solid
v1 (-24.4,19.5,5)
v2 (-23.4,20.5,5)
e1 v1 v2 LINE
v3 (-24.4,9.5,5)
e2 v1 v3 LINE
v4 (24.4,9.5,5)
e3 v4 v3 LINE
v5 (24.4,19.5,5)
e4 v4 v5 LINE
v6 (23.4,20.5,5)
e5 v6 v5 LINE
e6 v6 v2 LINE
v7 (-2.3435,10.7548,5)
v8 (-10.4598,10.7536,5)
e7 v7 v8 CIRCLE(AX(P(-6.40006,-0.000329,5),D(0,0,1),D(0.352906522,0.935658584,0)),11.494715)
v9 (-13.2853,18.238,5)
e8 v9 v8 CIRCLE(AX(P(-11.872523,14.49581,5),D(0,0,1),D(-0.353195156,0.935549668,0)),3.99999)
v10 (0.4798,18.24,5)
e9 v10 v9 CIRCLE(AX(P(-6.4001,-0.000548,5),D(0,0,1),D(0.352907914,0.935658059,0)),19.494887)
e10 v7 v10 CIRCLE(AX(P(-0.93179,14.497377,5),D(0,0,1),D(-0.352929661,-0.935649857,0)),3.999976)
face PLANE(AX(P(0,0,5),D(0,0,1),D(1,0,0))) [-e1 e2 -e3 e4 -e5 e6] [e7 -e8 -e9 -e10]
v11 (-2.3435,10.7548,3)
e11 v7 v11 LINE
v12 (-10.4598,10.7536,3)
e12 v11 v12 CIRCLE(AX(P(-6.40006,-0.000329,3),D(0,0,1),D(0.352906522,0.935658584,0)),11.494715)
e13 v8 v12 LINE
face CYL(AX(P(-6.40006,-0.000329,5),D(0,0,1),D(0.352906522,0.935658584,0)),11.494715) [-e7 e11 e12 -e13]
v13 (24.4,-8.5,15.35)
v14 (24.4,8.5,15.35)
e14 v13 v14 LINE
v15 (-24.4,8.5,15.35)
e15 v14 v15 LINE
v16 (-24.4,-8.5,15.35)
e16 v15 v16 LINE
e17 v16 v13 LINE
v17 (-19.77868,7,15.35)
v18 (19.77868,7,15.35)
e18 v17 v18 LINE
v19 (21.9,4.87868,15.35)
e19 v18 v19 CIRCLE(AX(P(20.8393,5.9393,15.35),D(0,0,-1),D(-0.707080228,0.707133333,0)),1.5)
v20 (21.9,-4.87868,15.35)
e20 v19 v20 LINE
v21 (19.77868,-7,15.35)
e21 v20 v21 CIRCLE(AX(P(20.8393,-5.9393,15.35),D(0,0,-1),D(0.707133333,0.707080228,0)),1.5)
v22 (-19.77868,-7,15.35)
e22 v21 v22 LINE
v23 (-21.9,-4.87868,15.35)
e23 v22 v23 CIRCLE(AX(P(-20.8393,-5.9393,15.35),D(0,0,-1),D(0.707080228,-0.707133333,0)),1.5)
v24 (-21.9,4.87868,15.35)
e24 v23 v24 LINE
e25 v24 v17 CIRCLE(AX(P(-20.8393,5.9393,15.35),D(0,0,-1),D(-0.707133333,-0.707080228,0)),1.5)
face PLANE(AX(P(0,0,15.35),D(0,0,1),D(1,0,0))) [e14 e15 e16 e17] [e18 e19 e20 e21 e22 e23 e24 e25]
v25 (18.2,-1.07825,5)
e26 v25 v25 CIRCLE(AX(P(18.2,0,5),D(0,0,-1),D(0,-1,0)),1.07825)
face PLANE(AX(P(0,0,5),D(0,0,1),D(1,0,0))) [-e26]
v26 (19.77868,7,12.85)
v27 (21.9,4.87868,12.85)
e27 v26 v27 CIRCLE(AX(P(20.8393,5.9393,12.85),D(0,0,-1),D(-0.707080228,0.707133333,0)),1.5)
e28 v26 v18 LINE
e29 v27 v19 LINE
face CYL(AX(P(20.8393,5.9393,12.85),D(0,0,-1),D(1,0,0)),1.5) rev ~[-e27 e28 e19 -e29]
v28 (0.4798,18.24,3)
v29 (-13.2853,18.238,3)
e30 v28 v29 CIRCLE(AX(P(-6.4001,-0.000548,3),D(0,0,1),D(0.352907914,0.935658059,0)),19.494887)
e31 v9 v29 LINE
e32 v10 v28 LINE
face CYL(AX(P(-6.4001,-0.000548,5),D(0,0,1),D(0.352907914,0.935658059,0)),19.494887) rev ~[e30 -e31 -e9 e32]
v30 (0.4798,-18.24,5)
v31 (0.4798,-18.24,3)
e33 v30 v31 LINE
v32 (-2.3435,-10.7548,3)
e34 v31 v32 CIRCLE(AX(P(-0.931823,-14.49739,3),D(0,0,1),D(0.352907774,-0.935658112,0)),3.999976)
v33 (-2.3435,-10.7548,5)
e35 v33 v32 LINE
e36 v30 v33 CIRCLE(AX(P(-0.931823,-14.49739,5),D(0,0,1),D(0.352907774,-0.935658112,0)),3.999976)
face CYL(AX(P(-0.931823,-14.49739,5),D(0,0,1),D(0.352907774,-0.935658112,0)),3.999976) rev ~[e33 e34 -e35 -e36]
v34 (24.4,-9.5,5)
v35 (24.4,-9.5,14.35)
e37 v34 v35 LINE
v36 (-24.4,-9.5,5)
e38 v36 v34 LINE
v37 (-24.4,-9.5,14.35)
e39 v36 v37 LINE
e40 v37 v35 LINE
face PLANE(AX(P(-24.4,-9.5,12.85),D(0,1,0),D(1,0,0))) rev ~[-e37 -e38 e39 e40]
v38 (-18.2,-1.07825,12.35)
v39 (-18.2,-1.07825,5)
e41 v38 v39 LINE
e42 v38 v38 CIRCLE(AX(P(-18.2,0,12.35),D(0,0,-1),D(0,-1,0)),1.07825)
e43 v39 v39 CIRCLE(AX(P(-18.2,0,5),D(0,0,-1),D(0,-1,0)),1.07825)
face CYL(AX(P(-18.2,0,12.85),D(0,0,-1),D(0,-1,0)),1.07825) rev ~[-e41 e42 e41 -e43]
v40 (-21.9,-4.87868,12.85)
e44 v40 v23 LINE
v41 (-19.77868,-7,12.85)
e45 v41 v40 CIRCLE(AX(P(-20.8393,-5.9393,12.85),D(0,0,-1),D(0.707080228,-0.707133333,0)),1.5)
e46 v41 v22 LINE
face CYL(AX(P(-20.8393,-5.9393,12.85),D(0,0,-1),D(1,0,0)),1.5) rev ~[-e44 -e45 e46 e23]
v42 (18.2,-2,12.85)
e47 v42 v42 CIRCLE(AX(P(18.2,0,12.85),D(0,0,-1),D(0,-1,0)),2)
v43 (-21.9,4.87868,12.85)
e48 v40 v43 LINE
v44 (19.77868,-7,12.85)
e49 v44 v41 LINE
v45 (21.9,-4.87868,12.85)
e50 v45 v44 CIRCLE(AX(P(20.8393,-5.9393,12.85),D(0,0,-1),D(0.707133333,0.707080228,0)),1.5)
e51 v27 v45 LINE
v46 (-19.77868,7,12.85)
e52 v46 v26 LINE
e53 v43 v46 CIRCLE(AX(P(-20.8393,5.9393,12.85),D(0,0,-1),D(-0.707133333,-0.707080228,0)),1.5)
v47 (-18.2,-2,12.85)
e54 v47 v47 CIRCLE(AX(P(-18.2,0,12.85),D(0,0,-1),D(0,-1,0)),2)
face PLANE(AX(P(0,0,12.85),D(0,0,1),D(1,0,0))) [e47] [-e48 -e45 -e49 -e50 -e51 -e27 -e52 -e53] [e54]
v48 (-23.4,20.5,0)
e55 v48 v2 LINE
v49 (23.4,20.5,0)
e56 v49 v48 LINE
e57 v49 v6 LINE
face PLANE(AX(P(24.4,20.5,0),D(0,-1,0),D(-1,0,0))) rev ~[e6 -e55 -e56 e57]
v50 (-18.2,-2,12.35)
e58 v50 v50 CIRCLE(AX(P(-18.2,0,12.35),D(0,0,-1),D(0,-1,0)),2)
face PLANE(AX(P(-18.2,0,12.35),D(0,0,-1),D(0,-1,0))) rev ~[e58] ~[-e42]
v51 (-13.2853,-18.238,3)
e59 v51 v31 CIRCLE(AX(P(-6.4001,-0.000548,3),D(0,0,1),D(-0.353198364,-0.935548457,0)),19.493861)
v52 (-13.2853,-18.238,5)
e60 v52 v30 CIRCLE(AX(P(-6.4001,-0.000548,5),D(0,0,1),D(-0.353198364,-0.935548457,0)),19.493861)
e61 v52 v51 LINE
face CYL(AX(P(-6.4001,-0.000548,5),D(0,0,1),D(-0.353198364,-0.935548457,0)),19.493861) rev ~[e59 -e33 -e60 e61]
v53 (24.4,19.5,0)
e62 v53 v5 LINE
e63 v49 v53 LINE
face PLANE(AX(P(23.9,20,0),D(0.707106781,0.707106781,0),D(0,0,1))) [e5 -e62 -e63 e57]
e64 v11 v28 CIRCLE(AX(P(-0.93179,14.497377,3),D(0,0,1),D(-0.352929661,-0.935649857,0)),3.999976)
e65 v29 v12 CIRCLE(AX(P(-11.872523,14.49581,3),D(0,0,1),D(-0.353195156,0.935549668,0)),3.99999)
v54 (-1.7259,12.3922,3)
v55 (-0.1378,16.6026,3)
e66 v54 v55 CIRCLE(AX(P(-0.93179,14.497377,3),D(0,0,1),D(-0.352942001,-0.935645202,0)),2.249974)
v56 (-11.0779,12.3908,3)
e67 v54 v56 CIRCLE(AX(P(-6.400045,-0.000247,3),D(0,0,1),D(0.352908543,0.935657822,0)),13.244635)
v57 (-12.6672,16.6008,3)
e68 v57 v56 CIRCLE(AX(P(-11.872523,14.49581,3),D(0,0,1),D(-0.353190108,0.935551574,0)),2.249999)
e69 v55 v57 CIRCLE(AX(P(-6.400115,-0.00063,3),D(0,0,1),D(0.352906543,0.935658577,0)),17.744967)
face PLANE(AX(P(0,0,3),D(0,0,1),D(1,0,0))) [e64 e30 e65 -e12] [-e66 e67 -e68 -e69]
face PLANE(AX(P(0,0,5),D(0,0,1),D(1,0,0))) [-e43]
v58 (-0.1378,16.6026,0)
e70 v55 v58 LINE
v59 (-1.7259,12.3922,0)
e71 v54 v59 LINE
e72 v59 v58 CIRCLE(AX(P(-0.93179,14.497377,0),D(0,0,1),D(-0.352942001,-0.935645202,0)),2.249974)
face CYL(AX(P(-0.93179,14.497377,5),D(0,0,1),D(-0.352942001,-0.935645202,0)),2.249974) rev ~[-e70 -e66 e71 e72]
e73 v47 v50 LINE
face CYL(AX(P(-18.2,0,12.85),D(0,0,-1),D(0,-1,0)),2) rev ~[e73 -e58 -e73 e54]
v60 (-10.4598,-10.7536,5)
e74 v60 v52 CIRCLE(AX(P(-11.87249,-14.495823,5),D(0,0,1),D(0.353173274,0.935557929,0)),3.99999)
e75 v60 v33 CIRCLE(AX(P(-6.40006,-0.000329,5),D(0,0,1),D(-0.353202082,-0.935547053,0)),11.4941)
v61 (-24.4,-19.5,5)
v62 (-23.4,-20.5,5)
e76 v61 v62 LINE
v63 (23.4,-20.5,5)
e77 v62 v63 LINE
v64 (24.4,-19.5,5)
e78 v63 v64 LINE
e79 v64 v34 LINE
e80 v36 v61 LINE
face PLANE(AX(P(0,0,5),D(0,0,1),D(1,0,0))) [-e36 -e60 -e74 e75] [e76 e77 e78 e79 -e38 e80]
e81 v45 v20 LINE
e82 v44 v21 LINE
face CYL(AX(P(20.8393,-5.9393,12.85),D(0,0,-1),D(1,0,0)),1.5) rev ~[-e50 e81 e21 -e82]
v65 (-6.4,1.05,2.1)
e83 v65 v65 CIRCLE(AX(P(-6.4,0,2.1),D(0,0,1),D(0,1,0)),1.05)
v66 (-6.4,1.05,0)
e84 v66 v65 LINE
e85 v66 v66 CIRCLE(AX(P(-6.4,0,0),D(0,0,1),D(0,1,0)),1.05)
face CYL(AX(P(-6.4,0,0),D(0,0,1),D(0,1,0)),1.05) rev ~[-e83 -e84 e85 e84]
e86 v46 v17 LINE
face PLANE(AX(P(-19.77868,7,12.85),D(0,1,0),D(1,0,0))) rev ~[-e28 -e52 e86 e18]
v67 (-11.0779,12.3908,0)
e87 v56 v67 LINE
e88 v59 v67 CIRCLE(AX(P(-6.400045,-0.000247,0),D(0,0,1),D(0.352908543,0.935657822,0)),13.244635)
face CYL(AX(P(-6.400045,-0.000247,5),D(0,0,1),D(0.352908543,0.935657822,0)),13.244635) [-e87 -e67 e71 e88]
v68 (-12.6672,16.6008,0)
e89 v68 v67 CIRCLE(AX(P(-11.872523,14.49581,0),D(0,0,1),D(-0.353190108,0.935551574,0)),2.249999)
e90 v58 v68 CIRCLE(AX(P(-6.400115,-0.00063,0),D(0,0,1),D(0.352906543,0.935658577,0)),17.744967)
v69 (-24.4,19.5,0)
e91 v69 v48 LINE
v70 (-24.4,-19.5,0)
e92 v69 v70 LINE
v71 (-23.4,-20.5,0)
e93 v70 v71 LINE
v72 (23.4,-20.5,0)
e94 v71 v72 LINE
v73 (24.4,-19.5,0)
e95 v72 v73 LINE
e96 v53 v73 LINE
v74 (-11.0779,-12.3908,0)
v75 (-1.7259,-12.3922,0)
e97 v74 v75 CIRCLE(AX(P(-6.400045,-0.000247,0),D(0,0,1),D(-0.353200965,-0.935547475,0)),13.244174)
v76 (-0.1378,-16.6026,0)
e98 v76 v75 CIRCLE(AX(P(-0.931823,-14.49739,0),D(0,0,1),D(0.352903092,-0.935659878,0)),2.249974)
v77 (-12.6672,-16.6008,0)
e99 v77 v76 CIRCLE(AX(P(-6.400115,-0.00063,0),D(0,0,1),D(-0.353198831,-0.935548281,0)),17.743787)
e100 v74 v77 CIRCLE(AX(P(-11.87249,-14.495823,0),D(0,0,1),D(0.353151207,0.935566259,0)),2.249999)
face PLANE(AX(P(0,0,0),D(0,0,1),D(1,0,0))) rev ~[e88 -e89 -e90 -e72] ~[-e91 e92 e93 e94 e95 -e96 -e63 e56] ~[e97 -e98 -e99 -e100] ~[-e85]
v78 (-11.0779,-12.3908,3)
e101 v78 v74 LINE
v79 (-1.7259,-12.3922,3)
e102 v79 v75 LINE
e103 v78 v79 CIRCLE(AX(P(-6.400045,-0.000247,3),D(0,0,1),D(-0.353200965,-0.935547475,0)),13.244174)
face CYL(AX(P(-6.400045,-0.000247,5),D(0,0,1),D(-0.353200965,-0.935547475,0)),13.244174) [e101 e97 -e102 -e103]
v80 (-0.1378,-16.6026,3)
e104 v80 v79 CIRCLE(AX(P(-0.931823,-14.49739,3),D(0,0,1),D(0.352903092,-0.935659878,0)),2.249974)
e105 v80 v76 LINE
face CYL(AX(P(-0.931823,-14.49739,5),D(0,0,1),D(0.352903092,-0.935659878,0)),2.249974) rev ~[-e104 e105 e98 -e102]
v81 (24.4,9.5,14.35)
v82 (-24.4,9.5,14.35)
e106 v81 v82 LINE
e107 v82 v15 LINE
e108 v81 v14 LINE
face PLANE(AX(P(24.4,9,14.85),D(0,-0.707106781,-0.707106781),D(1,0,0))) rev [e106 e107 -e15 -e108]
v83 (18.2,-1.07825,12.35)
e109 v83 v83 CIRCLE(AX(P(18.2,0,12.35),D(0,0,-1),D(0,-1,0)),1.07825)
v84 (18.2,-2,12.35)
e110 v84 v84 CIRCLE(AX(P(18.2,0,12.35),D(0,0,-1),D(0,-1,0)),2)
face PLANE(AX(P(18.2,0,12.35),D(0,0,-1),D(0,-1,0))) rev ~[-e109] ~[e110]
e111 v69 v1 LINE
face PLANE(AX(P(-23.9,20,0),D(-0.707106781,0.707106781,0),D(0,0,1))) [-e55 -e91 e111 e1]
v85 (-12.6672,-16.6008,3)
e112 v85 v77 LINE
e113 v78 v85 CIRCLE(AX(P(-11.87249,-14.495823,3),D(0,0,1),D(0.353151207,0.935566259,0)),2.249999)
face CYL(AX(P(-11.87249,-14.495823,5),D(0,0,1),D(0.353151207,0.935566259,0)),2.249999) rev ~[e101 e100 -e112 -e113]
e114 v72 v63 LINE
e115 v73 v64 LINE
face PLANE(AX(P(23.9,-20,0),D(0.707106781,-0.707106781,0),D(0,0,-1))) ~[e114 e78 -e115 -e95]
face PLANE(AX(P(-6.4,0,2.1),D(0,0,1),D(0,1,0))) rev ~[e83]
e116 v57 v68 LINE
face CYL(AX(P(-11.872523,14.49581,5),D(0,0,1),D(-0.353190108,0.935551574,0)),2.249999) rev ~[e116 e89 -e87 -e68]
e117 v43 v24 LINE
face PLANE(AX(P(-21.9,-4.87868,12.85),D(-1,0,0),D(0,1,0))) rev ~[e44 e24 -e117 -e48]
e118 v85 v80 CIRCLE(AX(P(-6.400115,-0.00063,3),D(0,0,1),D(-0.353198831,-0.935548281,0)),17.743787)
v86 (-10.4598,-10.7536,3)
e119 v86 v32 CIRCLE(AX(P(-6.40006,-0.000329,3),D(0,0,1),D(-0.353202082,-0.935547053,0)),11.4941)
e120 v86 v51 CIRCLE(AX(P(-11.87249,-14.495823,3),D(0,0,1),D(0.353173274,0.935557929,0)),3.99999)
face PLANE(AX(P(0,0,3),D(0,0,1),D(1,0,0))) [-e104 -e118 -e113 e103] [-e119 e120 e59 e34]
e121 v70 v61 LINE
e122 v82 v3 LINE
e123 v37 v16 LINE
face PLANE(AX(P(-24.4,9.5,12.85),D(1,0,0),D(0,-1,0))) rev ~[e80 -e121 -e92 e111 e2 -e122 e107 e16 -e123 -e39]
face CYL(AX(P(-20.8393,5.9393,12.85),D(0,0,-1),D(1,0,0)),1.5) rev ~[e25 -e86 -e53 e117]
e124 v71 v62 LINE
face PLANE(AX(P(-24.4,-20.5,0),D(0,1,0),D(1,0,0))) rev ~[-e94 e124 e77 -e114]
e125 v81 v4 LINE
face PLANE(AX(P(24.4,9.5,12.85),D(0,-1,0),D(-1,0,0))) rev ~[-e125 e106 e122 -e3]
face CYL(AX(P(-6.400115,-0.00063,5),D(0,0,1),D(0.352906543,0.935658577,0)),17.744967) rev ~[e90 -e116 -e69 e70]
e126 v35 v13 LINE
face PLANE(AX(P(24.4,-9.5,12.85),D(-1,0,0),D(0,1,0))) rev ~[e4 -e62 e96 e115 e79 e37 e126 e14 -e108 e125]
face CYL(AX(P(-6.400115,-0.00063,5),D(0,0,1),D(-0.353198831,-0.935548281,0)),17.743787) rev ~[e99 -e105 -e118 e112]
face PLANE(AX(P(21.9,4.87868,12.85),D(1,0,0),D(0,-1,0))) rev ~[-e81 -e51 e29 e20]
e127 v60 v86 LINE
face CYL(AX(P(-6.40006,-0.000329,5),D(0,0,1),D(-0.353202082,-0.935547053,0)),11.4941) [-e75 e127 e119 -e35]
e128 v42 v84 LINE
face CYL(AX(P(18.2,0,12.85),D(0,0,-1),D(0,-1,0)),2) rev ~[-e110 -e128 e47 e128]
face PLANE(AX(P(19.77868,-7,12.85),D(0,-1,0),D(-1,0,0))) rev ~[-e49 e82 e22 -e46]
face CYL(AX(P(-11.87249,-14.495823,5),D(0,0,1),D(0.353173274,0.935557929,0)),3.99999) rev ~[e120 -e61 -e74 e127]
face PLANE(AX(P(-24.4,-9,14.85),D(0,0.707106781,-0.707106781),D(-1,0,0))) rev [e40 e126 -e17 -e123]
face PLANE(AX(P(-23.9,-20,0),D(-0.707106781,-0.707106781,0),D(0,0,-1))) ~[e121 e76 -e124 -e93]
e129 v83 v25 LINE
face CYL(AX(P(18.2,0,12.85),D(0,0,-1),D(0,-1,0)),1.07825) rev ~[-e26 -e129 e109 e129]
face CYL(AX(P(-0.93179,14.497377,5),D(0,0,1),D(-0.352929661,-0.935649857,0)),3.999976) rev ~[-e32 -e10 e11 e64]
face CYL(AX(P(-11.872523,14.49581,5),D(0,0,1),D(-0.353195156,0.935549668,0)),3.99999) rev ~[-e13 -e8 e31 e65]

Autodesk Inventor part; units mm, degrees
ref_plane "YZ Plane" through (0, 0, 0) normal (1, 0, 0) x (0, 1, 0)
ref_plane "XZ Plane" through (0, 0, 0) normal (0, 1, 0) x (-1, 0, 0)
ref_plane "XY Plane" through (0, 0, 0) normal (0, 0, 1) x (1, 0, 0)
sketch "Sketch1" plane through (0, 0, 0) normal (0, 0, 1) x (1, 0, 0)
  line L0 (-24.4, -9.5) -> (24.4, -9.5)
  line L1 (24.4, -9.5) -> (24.4, 9.5)
  line L2 (24.4, 9.5) -> (-24.4, 9.5)
  line L3 (-24.4, 9.5) -> (-24.4, -9.5)
  line L4 (-24.4, -9.5) -> (24.4, 9.5) construction
  line L5 (24.4, -9.5) -> (-24.4, 9.5) construction
  point P0 (0, 0)
  dimension "LENGTH" = 48.8
  dimension "WIDTH" = 19
extrude "Extrusion1" add sketch "Sketch1" along normal blind 12.85
sketch "Sketch2" plane through (0, 0, 12.85) normal (0, 0, 1) x (1, 0, 0)
  point P0 (0, 0)
  point P1 (-18.2, 0)
  point P2 (18.2, 0)
  dimension "d11" = 0
  dimension "d12" = 0
  dimension "d13" = 36.4
  dimension "d14" = 18.2
hole "Hole1" at (-18.2, 0, 12.85) at (18.2, 0, 12.85) direction (0, 0, -1) diameter 2.1565 depth 8.87 thread size "4-40 UNC" class "2B" standard "ANSI Unified Screw Threads"
sketch "Sketch3" plane through (0, 0, 12.85) normal (0, 0, 1) x (1, 0, 0)
  point P0 (0, 0)
  point P1 (0, 0)
  dimension "d22" = 0
  dimension "d23" = 0
hole "Hole2" [suppressed]
sketch "Sketch4" plane through (0, 0, 0) normal (0, 0, -1) x (-1, 0, 0)
  line L0 (5.5, 0) -> (4.5, 0) construction
  line L1 (5.5, 1.05) -> (4.5, 1.05)
  line L2 (4.5, -1.05) -> (5.5, -1.05)
  arc A0 (5.5, -1.05) -> (5.5, 1.05) centre (5.5, 0) ccw
  arc A1 (4.5, 1.05) -> (4.5, -1.05) centre (4.5, 0) ccw
  point P0 (0, 0)
  point P1 (-5, 0)
  point P2 (5, 0)
  dimension "d24" = 1
  dimension "d25" = 0
  dimension "d26" = 0
  dimension "d27" = 10
  dimension "d28" = 5
  dimension "d29" = 1.05
hole "Hole3" [suppressed]
extrude "Extrusion2" [suppressed]
sketch "Sketch5" plane through (0, 0, 0) normal (0, 0, 1) x (1, 0, 0)
  line L0 (-24.4, -20.5) -> (24.4, -20.5)
  line L1 (24.4, -20.5) -> (24.4, 20.5)
  line L2 (24.4, 20.5) -> (-24.4, 20.5)
  line L3 (-24.4, 20.5) -> (-24.4, -20.5)
  line L4 (-24.4, -20.5) -> (24.4, 20.5) construction
  line L5 (24.4, -20.5) -> (-24.4, 20.5) construction
  point P0 (0, 0)
  dimension "d39" = 48.8
  dimension "d40" = 41
extrude "Extrusion3" add sketch "Sketch5" along normal blind 5
sketch "Sketch7" plane through (0, 0, 12.85) normal (0, 0, 1) x (1, 0, 0)
  circle A0 centre (18.2, 0) radius 1.0782 projected
  circle A1 centre (-18.2, 0) radius 1.0782 projected
  point P0 (0, 0)
  dimension "d54" = 0
  dimension "d55" = 0
  dimension "d56" = 0
  dimension "d57" = 0
hole "Hole5" at (18.2, 0, 12.85) at (-18.2, 0, 12.85) direction (0, 0, -1) diameter 4 depth 0.5
chamfer "Chamfer2" distance 1 angle 45 4 edges at (24.4, -20.5, 2.5) (24.4, 20.5, 2.5) (-24.4, 20.5, 2.5) (-24.4, -20.5, 2.5)
sketch "Sketch8" plane through (0, 0, 0) normal (0, 0, -1) x (-1, 0, 0)
  line L0 (0, 5.5) -> (0, 4.5) construction
  line L1 (-1.05, 5.5) -> (-1.05, 4.5)
  line L2 (1.05, 4.5) -> (1.05, 5.5)
  arc A0 (1.05, 5.5) -> (-1.05, 5.5) centre (0, 5.5) ccw
  arc A1 (-1.05, 4.5) -> (1.05, 4.5) centre (0, 4.5) ccw
  point P0 (0, 0)
  point P1 (0, -5)
  point P2 (0, 5)
  dimension "d77" = 1
  dimension "d78" = 1.05
  dimension "d79" = 10
  dimension "d80" = 0
  dimension "d81" = 0
  dimension "d82" = 5
hole "Hole6" [suppressed]
extrude "Extrusion4" [suppressed]
sketch "Sketch9" plane through (-24.4, -19.5, 0) normal (-1, 0, 0) x (0, 0, 1)
  circle A0 centre (-12.35, 19.5) radius 12.7
  line L0 (0, 39) -> (0, 0) projected
  point P0 (0, 19.5)
  point P1 (0, 16.539)
  point P2 (0, 22.461)
  dimension "d92" = 25.4
  dimension "d93" = 0
  dimension "d94" = 12.35
extrude "Extrusion5" [suppressed]
sketch "Sketch10" plane through (0, 0, 12.85) normal (0, 0, 1) x (1, 0, 0)
  line L0 (-24.4, -9.5) -> (24.4, -9.5)
  line L1 (24.4, -9.5) -> (24.4, 9.5)
  line L2 (24.4, 9.5) -> (-24.4, 9.5)
  line L3 (-24.4, 9.5) -> (-24.4, -9.5)
  line L4 (-24.4, -9.5) -> (24.4, 9.5) construction
  line L5 (24.4, -9.5) -> (-24.4, 9.5) construction
  line L6 (21.9, -7) -> (-21.9, -7)
  line L7 (-21.9, -7) -> (-21.9, 7)
  line L8 (-21.9, 7) -> (21.9, 7)
  line L9 (21.9, 7) -> (21.9, -7)
  line L10 (21.9, -7) -> (-21.9, 7) construction
  line L11 (-21.9, -7) -> (21.9, 7) construction
  circle A0 centre (-20.8393, 5.9393) radius 1.5
  circle A1 centre (-20.8393, -5.9393) radius 1.5
  circle A2 centre (20.8393, 5.9393) radius 1.5
  circle A3 centre (20.8393, -5.9393) radius 1.5
  line L12 (20.8393, 5.9393) -> (21.9, 7)
  line L13 (21.9, -7) -> (20.8393, -5.9393)
  line L14 (-20.8393, 5.9393) -> (-21.9, 7)
  line L15 (-20.8393, -5.9393) -> (-21.9, -7)
  point P0 (0, 0)
  point P1 (21.9, -4.8787)
  point P2 (19.7787, -7)
  point P3 (-19.7787, -7)
  point P4 (-21.9, -4.8787)
  point P5 (-21.9, 4.8787)
  point P6 (-19.7787, 7)
  point P7 (19.7787, 7)
  point P8 (21.9, 4.8787)
  dimension "d106" = 3
  dimension "d110" = 3
  dimension "d111" = 3
  dimension "d112" = 3
  dimension "d97" = 48.8
  dimension "d98" = 19
  dimension "d99" = 43.8
  dimension "d100" = 14
  dimension "d107" = 45
  dimension "d108" = 45
  dimension "d109" = 45
extrude "Extrusion6" add sketch "Sketch10" along normal blind 2.5
chamfer "Chamfer5" [suppressed]
chamfer "Chamfer6" distance 1 angle 45 2 edges at (0, -9.5, 15.35) (0, 9.5, 15.35)
sketch "Sketch12" plane through (0, 0, 5) normal (0, 0, 1) x (1, 0, 0)
  arc A0 (7.9961, 15.4962) -> (-8.004, 14.5013) centre (9.4196, -136.543) ccw construction
  arc A1 (7.9587, 19.496) -> (-8.4624, 18.4749) centre (9.4196, -136.543) ccw
  arc A2 (8.0336, 11.4964) -> (-7.5457, 10.5276) centre (9.4196, -136.543) ccw
  arc A3 (8.0336, 11.4964) -> (7.9587, 19.496) centre (7.9961, 15.4962) ccw
  arc A4 (-8.4624, 18.4749) -> (-7.5457, 10.5276) centre (-8.004, 14.5013) ccw
  line L0 (24.4, 2.961) -> (24.4, -2.961)
  line L1 (24.4, 0) -> (-24.4, 0)
  line L2 (-24.4, 8.5) -> (-24.4, -8.5)
  arc A5 (7.9961, 15.4962) -> (-8.004, 14.5013) centre (9.4196, -136.543) ccw construction
  arc A6 (7.9751, 17.7461) -> (-8.2619, 16.7364) centre (9.4196, -136.543) ccw
  arc A7 (8.0172, 13.2463) -> (-7.7462, 12.2661) centre (9.4196, -136.543) ccw
  arc A8 (8.0172, 13.2463) -> (7.9751, 17.7461) centre (7.9961, 15.4962) ccw
  arc A9 (-8.2619, 16.7364) -> (-7.7462, 12.2661) centre (-8.004, 14.5013) ccw
  arc A10 (-8.004, -14.5013) -> (7.9961, -15.4962) centre (9.4196, 136.543) ccw construction
  arc A11 (-8.4624, -18.4749) -> (7.9587, -19.496) centre (9.4196, 136.543) ccw
  arc A12 (-7.5457, -10.5276) -> (8.0336, -11.4964) centre (9.4196, 136.543) ccw
  arc A13 (7.9587, -19.496) -> (8.0336, -11.4964) centre (7.9961, -15.4962) ccw
  arc A14 (-7.5457, -10.5276) -> (-8.4624, -18.4749) centre (-8.004, -14.5013) ccw
  arc A15 (-8.004, -14.5013) -> (7.9961, -15.4962) centre (9.4196, 136.543) ccw construction
  arc A16 (-8.2619, -16.7364) -> (7.9751, -17.7461) centre (9.4196, 136.543) ccw
  arc A17 (-7.7462, -12.2661) -> (8.0172, -13.2463) centre (9.4196, 136.543) ccw
  arc A18 (7.9751, -17.7461) -> (8.0172, -13.2463) centre (7.9961, -15.4962) ccw
  arc A19 (-7.7462, -12.2661) -> (-8.2619, -16.7364) centre (-8.004, -14.5013) ccw
  point P0 (0, 0)
  point P1 (-8.004, 12.753)
  point P2 (7.9961, 17.2527)
  point P3 (-6.4165, 14.3405)
  point P4 (9.5836, 18.8402)
  point P5 (-8.004, -12.753)
  point P6 (7.9961, -17.2527)
  point P7 (9.5836, -18.8402)
  point P8 (-6.4165, -14.3405)
  dimension "d118" = 8
  dimension "d122" = 4.5
extrude "Extrusion12" [suppressed]
extrude "Extrusion13" [suppressed]
sketch "Sketch14" plane through (0, 0, 0) normal (0, 0, -1) x (-1, 0, 0)
  point P0 (0, 0)
  point P1 (6.4, 0)
hole "Hole7" at (-6.4, 0, 0) direction (0, 0, 1) diameter 2.1 depth 2.1
sketch "Sketch15" plane through (0, 0, 0) normal (0, 0, -1) x (-1, 0, 0)
  circle A0 centre (6.4, 0) radius 1.05 projected
  circle A1 centre (6.4, 0) radius 19.5
  circle A2 centre (6.4, 0) radius 11.5
  circle A3 centre (6.4, 0) radius 17.75
  circle A4 centre (6.4, 0) radius 13.25
  line L0 (-24.4, 9.5) -> (24.4, 9.5) projected
  line L1 (24.4, 9.5) -> (-24.4, 9.5)
  line L2 (-24.4, -19.5) -> (-24.4, 19.5) projected
  line L3 (24.4, -9.5) -> (-24.4, -9.5) projected
  line L4 (24.4, -9.5) -> (-24.4, -9.5)
  arc A5 (9.3371, 17.5053) -> (5.1369, 17.705) centre (6.4, 0) ccw
  arc A6 (8.5925, 13.0673) -> (5.4572, 13.2164) centre (6.4, 0) ccw
  arc A7 (13.9857, 17.9641) -> (-1.4292, 17.8592) centre (6.4, 0) ccw
  arc A8 (10.8736, 10.5942) -> (1.7828, 10.5324) centre (6.4, 0) ccw
  arc A9 (11.8707, 14.5025) -> (0.9294, 14.5025) centre (6.4, 0) ccw construction
  arc A10 (13.2825, 18.2451) -> (-0.4824, 18.2451) centre (6.4, 0) ccw
  arc A11 (10.4589, 10.7599) -> (2.3412, 10.7599) centre (6.4, 0) ccw
  arc A12 (10.4589, 10.7599) -> (13.2825, 18.2451) centre (11.8707, 14.5025) ccw
  arc A13 (-0.4824, 18.2451) -> (2.3412, 10.7599) centre (0.9294, 14.5025) ccw
  arc A14 (11.8707, 14.5025) -> (0.9294, 14.5025) centre (6.4, 0) ccw construction
  arc A15 (12.6648, 16.6077) -> (0.1352, 16.6077) centre (6.4, 0) ccw
  arc A16 (11.0766, 12.3973) -> (1.7235, 12.3973) centre (6.4, 0) ccw
  arc A17 (11.0766, 12.3973) -> (12.6648, 16.6077) centre (11.8707, 14.5025) ccw
  arc A18 (0.1352, 16.6077) -> (1.7235, 12.3973) centre (0.9294, 14.5025) ccw
  line L5 (24.4, 8.5) -> (24.4, -8.5) projected
  line L6 (24.4, 0) -> (-24.4, 0)
  arc A19 (5.1369, -17.705) -> (9.3371, -17.5053) centre (6.4, 0) ccw
  arc A20 (5.4572, -13.2164) -> (8.5925, -13.0673) centre (6.4, 0) ccw
  arc A21 (-1.4292, -17.8592) -> (13.9857, -17.9641) centre (6.4, 0) ccw
  arc A22 (1.7828, -10.5324) -> (10.8736, -10.5942) centre (6.4, 0) ccw
  arc A23 (0.9294, -14.5025) -> (11.8707, -14.5025) centre (6.4, 0) ccw construction
  arc A24 (-0.4824, -18.2451) -> (13.2825, -18.2451) centre (6.4, 0) ccw
  arc A25 (2.3412, -10.7599) -> (10.4589, -10.7599) centre (6.4, 0) ccw
  arc A26 (13.2825, -18.2451) -> (10.4589, -10.7599) centre (11.8707, -14.5025) ccw
  arc A27 (2.3412, -10.7599) -> (-0.4824, -18.2451) centre (0.9294, -14.5025) ccw
  arc A28 (0.9294, -14.5025) -> (11.8707, -14.5025) centre (6.4, 0) ccw construction
  arc A29 (0.1352, -16.6077) -> (12.6648, -16.6077) centre (6.4, 0) ccw
  arc A30 (1.7235, -12.3973) -> (11.0766, -12.3973) centre (6.4, 0) ccw
  arc A31 (12.6648, -16.6077) -> (11.0766, -12.3973) centre (11.8707, -14.5025) ccw
  arc A32 (1.7235, -12.3973) -> (0.1352, -16.6077) centre (0.9294, -14.5025) ccw
  point P0 (0, 0)
  point P1 (6.4, 15.5)
  point P2 (6.4, -15.5)
  dimension "d140" = 39
  dimension "d141" = 23
  dimension "d142" = 35.5
  dimension "d143" = 26.5
  dimension "d147" = 8
  dimension "d148" = 4.5
sketch "Sketch17" plane through (0, 0, 5) normal (0, 0, 1) x (1, 0, 0)
  circle A0 centre (-6.4, 0) radius 1.05 projected
  arc A1 (-11.8725, -14.4958) -> (-0.9318, -14.4974) centre (-6.4, 0) ccw construction
  arc A2 (-12.6672, -16.6008) -> (-0.1378, -16.6026) centre (-6.4, 0) ccw
  arc A3 (-11.0779, -12.3908) -> (-1.7259, -12.3922) centre (-6.4, 0) ccw
  arc A4 (-11.0779, -12.3908) -> (-12.6672, -16.6008) centre (-11.8725, -14.4958) ccw
  arc A5 (-0.1378, -16.6026) -> (-1.7259, -12.3922) centre (-0.9318, -14.4974) ccw
  arc A6 (-11.8725, -14.4958) -> (-0.9318, -14.4974) centre (-6.4, 0) ccw construction
  arc A7 (-13.2853, -18.238) -> (0.4798, -18.24) centre (-6.4, 0) ccw
  arc A8 (-10.4598, -10.7536) -> (-2.3435, -10.7548) centre (-6.4, 0) ccw
  arc A9 (-10.4598, -10.7536) -> (-13.2853, -18.238) centre (-11.8725, -14.4958) ccw
  arc A10 (0.4798, -18.24) -> (-2.3435, -10.7548) centre (-0.9318, -14.4974) ccw
  line L0 (-24.1444, 0) -> (24.3913, 0)
  line L1 (24.3913, 0) -> (-24.1444, 0)
  arc A11 (-0.9318, 14.4974) -> (-11.8725, 14.4958) centre (-6.4, 0) ccw construction
  arc A12 (-0.1378, 16.6026) -> (-12.6672, 16.6008) centre (-6.4, 0) ccw
  arc A13 (-1.7259, 12.3922) -> (-11.0779, 12.3908) centre (-6.4, 0) ccw
  arc A14 (-12.6672, 16.6008) -> (-11.0779, 12.3908) centre (-11.8725, 14.4958) ccw
  arc A15 (-1.7259, 12.3922) -> (-0.1378, 16.6026) centre (-0.9318, 14.4974) ccw
  arc A16 (-0.9318, 14.4974) -> (-11.8725, 14.4958) centre (-6.4, 0) ccw construction
  arc A17 (0.4798, 18.24) -> (-13.2853, 18.238) centre (-6.4, 0) ccw
  arc A18 (-2.3435, 10.7548) -> (-10.4598, 10.7536) centre (-6.4, 0) ccw
  arc A19 (-13.2853, 18.238) -> (-10.4598, 10.7536) centre (-11.8725, 14.4958) ccw
  arc A20 (-2.3435, 10.7548) -> (0.4798, 18.24) centre (-0.9318, 14.4974) ccw
  point P0 (0, 0)
  point P1 (-0.9324, -14.4958)
  point P2 (-0.9324, 14.4958)
  dimension "d149" = 4.5
  dimension "d150" = 8
extrude "Extrusion14" cut sketch "Sketch17" against normal through all contours A4 A3 A5 A2 | A15 A13 A14 A12
extrude "Extrusion15" cut sketch "Sketch17" against normal blind 2 contours A9 A8 A10 A7 | A20 A18 A19 A17
equation "\"d2\" = BEAM_HEIGHT - APERTURE_HEIGHT"
equation "\"d14\" = 0.5 * d13"
equation "\"d39\" = LENGTH"
equation "\"d106\" = d110"
equation "\"d111\" = d110"
equation "\"d112\" = d110"
equation "\"d97\" = LENGTH"
equation "\"d98\" = WIDTH"
equation "\"BEAM_HEIGHT\" = 19.05"
equation "\"APERTURE_HEIGHT\" = 6.2"
properties part number "ADAPTER_AOM-brimrose"
